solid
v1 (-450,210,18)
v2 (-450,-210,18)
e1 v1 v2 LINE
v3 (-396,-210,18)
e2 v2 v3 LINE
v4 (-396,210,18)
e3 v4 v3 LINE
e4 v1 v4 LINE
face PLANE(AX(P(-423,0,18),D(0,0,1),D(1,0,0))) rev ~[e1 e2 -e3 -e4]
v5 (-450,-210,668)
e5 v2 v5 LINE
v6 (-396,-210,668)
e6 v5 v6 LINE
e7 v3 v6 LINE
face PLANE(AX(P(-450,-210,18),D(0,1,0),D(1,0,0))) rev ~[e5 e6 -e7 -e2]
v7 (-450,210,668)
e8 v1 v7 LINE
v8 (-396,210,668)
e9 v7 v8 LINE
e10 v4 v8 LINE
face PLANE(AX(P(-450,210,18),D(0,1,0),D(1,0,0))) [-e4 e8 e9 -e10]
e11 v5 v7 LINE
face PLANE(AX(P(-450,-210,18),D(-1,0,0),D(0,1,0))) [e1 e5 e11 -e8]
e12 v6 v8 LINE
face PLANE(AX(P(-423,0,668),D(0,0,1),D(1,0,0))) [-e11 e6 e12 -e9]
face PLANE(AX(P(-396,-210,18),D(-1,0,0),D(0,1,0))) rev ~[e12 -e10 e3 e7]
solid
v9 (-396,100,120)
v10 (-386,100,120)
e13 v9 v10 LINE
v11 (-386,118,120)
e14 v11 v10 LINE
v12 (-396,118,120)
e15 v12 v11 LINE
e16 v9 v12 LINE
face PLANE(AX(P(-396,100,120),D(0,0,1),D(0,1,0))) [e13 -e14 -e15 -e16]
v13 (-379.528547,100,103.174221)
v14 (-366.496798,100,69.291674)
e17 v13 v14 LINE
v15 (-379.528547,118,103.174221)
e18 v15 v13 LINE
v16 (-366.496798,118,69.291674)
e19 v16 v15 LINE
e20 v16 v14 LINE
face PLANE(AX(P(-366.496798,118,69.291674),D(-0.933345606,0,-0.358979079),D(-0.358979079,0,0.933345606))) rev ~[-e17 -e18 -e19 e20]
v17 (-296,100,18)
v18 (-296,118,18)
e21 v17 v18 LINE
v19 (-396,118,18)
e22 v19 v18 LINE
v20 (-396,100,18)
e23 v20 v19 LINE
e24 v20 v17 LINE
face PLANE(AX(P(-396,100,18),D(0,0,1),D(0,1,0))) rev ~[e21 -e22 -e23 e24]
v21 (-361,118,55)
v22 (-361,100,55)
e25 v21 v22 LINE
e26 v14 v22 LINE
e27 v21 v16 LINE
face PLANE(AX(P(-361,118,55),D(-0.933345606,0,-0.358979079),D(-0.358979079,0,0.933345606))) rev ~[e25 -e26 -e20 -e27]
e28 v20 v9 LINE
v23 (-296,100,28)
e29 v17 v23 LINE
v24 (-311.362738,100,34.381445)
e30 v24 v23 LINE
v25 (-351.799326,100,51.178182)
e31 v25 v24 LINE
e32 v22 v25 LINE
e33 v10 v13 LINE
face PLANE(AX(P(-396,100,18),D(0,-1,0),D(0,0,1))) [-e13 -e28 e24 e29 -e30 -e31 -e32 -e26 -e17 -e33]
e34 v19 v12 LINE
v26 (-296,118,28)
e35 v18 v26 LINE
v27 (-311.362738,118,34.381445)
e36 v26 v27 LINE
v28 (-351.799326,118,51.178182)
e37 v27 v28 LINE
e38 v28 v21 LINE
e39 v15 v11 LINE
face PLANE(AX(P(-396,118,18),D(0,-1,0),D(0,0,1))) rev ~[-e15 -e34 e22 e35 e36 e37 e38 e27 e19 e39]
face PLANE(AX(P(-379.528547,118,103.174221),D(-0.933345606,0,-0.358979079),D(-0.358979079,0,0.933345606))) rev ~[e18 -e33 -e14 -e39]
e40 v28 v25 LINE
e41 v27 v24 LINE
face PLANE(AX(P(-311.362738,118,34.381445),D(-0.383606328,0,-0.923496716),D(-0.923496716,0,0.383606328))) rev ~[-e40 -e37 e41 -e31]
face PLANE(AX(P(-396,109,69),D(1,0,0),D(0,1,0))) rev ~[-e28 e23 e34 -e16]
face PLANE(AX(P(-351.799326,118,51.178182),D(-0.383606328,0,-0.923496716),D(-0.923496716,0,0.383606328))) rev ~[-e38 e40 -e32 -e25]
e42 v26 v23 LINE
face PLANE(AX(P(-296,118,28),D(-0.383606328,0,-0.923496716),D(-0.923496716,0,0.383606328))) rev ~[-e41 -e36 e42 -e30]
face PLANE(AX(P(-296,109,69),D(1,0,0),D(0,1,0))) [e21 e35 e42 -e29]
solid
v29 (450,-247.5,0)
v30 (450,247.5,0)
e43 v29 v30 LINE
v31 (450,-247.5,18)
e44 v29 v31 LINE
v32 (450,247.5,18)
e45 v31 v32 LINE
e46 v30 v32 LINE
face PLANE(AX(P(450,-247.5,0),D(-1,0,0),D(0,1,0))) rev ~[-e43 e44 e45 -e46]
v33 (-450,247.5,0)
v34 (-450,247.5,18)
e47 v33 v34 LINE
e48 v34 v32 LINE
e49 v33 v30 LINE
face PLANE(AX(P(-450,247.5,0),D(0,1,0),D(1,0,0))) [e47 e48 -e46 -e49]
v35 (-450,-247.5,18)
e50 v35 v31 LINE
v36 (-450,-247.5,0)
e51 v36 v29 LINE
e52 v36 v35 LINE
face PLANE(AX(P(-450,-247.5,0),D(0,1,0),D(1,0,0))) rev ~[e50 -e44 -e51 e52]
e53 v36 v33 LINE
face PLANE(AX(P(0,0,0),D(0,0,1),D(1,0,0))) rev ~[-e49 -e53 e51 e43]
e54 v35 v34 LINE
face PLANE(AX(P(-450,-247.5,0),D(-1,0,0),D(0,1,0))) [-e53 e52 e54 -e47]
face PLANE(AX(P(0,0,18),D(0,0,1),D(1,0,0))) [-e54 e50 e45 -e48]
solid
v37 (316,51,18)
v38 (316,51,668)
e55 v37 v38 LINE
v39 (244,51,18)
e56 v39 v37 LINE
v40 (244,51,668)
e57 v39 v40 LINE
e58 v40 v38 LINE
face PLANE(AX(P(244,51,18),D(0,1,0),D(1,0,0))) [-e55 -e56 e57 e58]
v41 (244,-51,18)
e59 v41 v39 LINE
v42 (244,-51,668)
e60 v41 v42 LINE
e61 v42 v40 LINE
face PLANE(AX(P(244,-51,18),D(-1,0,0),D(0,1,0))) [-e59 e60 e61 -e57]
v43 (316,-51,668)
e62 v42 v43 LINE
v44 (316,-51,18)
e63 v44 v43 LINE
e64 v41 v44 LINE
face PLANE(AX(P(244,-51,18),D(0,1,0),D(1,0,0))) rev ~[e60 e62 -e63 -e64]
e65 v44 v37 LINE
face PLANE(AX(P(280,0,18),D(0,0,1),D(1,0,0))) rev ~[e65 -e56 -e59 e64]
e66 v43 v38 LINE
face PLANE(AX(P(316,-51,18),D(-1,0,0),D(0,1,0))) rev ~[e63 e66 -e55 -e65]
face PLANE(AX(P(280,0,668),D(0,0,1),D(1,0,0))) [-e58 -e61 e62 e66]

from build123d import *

# Parameters (mm, degrees)
F0_W      = 900
F0_H      = 495
F1_DEPTH  = 18
F2_W      = 54
F2_H      = 420
F3_DEPTH  = 650
F2_W_2    = 72
F2_H_2    = 102
F4_W      = 102
F4_H      = 650
F5_DEPTH  = 766.001
F6_W      = 18
F6_H      = 102
F7_DEPTH  = 100
F8_DEPTH  = 650
F10_DEPTH = 25


# Not quite as in the source:
# - a feature names something its author has since deleted; it is built from what else it names


with BuildPart() as f1:
    # F0 (on Top) → F1 (new body)
    with BuildSketch(Plane.XY):
        Rectangle(F0_W, F0_H)
    extrude(amount=F1_DEPTH)


with BuildPart() as f3:
    # F2 (on face) → F3 (new body)
    with BuildSketch(Plane.XY.offset(18)):
        with Locations((-423, 0)):
            Rectangle(F2_W, F2_H)
    extrude(amount=F3_DEPTH)


with BuildPart() as f3b:
    # F2 (on face) → F3, piece 2 (new body)
    with BuildSketch(Plane.XY.offset(18)):
        with Locations((280, 0)):
            Rectangle(F2_W_2, F2_H_2)
    extrude(amount=F3_DEPTH)


with BuildPart() as f5_tool:
    # F4 (on face) → F5 (new body, through all)
    with BuildSketch(Plane.YZ.offset(316)):
        with Locations((0, 343)):
            Rectangle(F4_W, F4_H)
    extrude(amount=-F5_DEPTH)


with BuildPart() as f3_1:
    add(f3.part)

    # F5: cut by f5_tool
    add(f5_tool.part, mode=Mode.SUBTRACT)

    # F2 (on face) → F8 (join)
    with BuildSketch(Plane.XY.offset(18)):
        with Locations((-423, 0)):
            Rectangle(F2_W, F2_H)
    extrude(amount=F8_DEPTH)


with BuildPart() as f3b_1:
    add(f3b.part)

    # F5: cut by f5_tool
    add(f5_tool.part, mode=Mode.SUBTRACT)


with BuildPart() as f7:
    # F6 (on face) → F7 (new body)
    with BuildSketch(Plane.YZ.offset(-396)):
        with Locations((109, 69)):
            Rectangle(F6_W, F6_H)
    extrude(amount=F7_DEPTH)

    # F9 (on face) → F10 (cut)
    with BuildSketch(Plane(origin=(0, 118, 0), x_dir=(-1, 0, 0), z_dir=(0, 1, 0))):
        Polygon((361, 55), (366.4967978412, 69.2916743872), (379.5285465821, 103.1742211134), (386, 120), (296, 120), (296, 28), (311.3627376398, 34.3814448658), (351.799326006, 51.1781815717), align=None)
    extrude(amount=-F10_DEPTH, mode=Mode.SUBTRACT)


with BuildPart() as f8:
    # F2 (on face) → F8, piece 2 (new body)
    with BuildSketch(Plane.XY.offset(18)):
        with Locations((280, 0)):
            Rectangle(F2_W_2, F2_H_2)
    extrude(amount=F8_DEPTH)


solid = Compound([f1.part, f3_1.part, f7.part, f8.part])
